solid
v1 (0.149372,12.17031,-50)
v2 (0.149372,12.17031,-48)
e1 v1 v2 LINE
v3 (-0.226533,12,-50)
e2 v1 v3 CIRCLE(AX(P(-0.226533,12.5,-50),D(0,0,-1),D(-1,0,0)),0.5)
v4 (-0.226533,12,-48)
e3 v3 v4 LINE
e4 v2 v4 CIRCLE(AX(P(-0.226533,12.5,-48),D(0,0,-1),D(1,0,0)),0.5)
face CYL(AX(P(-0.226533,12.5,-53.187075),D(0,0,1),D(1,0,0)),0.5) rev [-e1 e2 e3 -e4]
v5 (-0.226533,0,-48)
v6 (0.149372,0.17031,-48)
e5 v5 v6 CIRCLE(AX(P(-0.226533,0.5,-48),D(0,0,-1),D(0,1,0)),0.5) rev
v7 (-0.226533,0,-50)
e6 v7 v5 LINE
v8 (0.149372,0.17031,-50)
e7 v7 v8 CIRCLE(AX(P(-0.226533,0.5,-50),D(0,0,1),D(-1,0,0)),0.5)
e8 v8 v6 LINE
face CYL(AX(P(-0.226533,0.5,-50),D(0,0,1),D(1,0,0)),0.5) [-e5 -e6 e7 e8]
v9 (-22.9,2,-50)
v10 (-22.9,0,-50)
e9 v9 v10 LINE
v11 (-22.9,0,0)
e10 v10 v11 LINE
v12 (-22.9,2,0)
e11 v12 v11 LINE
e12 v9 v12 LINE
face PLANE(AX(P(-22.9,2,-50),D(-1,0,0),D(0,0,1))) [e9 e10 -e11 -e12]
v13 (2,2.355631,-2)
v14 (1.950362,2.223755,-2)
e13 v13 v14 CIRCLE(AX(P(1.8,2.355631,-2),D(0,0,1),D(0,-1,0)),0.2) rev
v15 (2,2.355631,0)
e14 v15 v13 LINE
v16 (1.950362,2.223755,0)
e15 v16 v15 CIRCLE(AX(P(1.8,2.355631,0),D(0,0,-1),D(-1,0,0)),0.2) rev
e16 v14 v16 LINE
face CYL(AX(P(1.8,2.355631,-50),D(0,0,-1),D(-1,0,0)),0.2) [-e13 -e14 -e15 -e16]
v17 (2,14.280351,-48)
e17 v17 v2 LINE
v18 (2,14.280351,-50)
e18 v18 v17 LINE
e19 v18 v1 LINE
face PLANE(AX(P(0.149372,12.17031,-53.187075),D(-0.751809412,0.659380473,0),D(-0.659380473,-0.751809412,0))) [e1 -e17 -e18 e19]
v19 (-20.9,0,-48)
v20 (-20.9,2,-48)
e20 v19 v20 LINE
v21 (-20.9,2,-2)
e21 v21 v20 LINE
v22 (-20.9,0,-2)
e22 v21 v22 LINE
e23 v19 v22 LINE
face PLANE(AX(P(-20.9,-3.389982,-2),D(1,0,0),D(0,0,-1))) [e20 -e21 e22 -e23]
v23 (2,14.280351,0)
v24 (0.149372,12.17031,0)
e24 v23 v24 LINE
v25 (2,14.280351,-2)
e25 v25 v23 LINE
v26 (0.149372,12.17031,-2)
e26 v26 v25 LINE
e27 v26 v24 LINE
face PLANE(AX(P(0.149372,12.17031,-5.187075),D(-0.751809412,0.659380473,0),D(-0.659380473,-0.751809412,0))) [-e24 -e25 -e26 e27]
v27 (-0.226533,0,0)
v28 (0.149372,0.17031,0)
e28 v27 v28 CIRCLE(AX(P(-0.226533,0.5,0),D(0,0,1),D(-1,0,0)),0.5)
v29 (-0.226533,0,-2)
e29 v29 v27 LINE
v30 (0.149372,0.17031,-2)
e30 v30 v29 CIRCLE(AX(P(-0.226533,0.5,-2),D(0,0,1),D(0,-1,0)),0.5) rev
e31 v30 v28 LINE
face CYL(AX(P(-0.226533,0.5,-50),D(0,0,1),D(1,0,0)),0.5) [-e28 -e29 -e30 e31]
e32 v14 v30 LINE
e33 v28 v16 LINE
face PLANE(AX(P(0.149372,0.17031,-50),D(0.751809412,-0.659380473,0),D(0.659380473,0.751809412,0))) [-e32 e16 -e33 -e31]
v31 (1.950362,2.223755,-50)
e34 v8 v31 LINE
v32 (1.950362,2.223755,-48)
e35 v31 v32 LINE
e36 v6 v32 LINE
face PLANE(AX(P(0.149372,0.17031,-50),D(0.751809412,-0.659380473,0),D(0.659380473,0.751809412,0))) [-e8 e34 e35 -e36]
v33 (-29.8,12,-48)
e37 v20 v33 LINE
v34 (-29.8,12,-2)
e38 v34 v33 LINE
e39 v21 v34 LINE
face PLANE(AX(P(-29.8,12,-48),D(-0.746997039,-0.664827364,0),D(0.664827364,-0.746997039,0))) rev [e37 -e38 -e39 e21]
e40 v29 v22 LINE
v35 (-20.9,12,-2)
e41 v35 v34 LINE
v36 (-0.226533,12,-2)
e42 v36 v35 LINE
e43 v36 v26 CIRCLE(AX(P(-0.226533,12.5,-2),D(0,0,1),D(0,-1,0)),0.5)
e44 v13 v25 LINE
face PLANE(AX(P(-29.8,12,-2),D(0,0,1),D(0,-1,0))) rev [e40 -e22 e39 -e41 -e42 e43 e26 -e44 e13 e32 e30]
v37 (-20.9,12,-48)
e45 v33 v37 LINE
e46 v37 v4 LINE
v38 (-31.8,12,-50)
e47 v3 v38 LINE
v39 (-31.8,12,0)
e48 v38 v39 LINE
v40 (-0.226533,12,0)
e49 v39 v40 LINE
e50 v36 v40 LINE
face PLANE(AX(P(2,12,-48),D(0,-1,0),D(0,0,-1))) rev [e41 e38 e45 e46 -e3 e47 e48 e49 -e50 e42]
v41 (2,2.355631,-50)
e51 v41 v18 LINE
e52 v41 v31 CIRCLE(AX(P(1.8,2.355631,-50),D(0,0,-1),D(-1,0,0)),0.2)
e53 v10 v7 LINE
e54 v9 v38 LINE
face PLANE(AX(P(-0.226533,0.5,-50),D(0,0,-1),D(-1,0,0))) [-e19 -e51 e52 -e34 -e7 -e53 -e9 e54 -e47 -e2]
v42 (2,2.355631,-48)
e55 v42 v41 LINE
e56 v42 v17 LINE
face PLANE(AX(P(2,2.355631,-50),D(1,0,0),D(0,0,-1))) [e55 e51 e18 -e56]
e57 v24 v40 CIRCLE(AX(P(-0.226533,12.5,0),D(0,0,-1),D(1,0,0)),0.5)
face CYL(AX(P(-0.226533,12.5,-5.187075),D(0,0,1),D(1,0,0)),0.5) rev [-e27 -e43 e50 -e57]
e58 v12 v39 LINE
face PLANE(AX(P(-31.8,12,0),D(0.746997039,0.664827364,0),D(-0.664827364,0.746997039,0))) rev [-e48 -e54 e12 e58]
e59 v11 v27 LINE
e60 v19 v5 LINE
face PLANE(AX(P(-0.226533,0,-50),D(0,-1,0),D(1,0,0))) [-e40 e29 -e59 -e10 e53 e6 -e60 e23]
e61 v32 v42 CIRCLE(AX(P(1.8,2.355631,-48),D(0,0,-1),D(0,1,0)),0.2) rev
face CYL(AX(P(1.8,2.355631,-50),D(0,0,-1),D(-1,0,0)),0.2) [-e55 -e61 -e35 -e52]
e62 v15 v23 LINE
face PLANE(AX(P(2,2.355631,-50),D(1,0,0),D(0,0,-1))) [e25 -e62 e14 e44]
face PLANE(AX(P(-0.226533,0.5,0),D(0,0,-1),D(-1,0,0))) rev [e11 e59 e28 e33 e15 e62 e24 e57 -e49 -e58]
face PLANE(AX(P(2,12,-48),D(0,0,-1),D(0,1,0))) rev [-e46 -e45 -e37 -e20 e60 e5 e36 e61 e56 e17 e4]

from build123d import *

# Parameters (mm, degrees)
BOSS_EXTRUDE1_DEPTH = 50
CUT_EXTRUDE1_DEPTH  = 13
FILLET1_R           = 0.2
CUT_EXTRUDE2_DEPTH  = 22.9
BOSS_EXTRUDE2_DEPTH = 2
BOSS_EXTRUDE4_START = -50
BOSS_EXTRUDE4_DEPTH = 2


with BuildPart() as part:
    # Sketch1 → Boss-Extrude1 (new body)
    with BuildSketch(Plane.XY):
        with BuildLine():
            Line((-0.226533162, 0), (-22.9, 0))
            Line((-22.9, 0), (-22.9, 2))
            Line((-22.9, 2), (-1.79756025, 2))
            ThreePointArc((-1.79756025, 2), (-1.552823997, 2.063990635), (-1.370731057, 2.239583333))
            ThreePointArc((-1.370731057, 2.239583333), (-0.802551257, 2.977276557), (-0.088888889, 3.575361503))
            ThreePointArc((-0.088888889, 3.575361503), (-0.023616579, 3.647376483), (0, 3.741657387))
            Line((0, 3.741657387), (0, 4))
            Line((0, 4), (2, 4))
            Line((2, 4), (2, 2.355630783))
            ThreePointArc((2, 2.355630783), (1.987179561, 2.285176459), (1.950361882, 2.223754688))
            Line((1.950361882, 2.223754688), (0.149371544, 0.170309763))
            ThreePointArc((0.149371544, 0.170309763), (-0.020190145, 0.044563331), (-0.226533162, 0))
        make_face()
    extrude(amount=-BOSS_EXTRUDE1_DEPTH)

    # Sketch3 → Loft1 section 0
    with BuildSketch(Plane(origin=(0, 2, 0), x_dir=(1, 0, 0), z_dir=(0, 1, 0))):
        with BuildLine():
            Line((2, 50), (-22.9, 50))
            Line((-22.9, 50), (-22.9, 0))
            Line((-22.9, 0), (2, 0))
            Line((2, 0), (2, 2))
            Line((2, 2), (-20.9, 2))
            Line((-20.9, 2), (-20.9, 48))
            Line((-20.9, 48), (2, 48))
            Line((2, 48), (2, 50))
        make_face()
    # Sketch4 → Loft1 section 1
    with BuildSketch(Plane(origin=(0, 12, 0), x_dir=(-1, 0, 0), z_dir=(0, 1, 0))):
        with BuildLine():
            Line((-2, -50), (31.8, -50))
            Line((31.8, -50), (31.8, 0))
            Line((31.8, 0), (-2, 0))
            Line((-2, 0), (-2, -2))
            Line((-2, -2), (29.8, -2))
            Line((29.8, -2), (29.8, -48))
            Line((29.8, -48), (-2, -48))
            Line((-2, -48), (-2, -50))
        make_face()
    loft()

    # Sketch5 → Cut-Extrude1 (cut)
    with BuildSketch(Plane(origin=(0, 0, 0), x_dir=(0, 0, -1), z_dir=(0.7518094115561124, -0.6593804733957871, 0))):
        Polygon((50, 0.226533162), (0, 0.226533162), (-3.433361375, 0.226533162), (-3.433361375, 4.468376884), (51.426542164, 4.468376884), (51.426542164, 0.226533162), align=None)
    extrude(amount=CUT_EXTRUDE1_DEPTH, mode=Mode.SUBTRACT)

    # Fillet1
    # the kernel refuses this fillet: 0.2 mm, written as the material it takes off along each edge
    with BuildSketch(Plane(origin=(2, 2.28035085, -47.811800168), x_dir=(0, 1, 0), z_dir=(0, 0, -1)), Plane(origin=(2, 2.28035085, 0.188199832), x_dir=(0, 1, 0), z_dir=(0, 0, -1))) as fillet1_piece_1:
        with BuildLine():
            CenterArc((FILLET1_R * 0.376399663711, -FILLET1_R), FILLET1_R, 90, 41.252641273)
            Line((-FILLET1_R * 0.282980809685, -FILLET1_R * 0.248190588444), (0, 0))
            Line((0, 0), (FILLET1_R * 0.376399663711, 0))
        make_face()
    extrude(amount=2.376399664, mode=Mode.SUBTRACT)

    # Sketch6 → Cut-Extrude2 (cut)
    with BuildSketch(Plane(origin=(2, 0, 0), x_dir=(0, 0, -1), z_dir=(1, 0, 0))):
        Polygon((2, 4), (2, 12), (48, 12), (48, 4), (48, -3.389982461), (2, -3.389982461), align=None)
    extrude(amount=-CUT_EXTRUDE2_DEPTH, mode=Mode.SUBTRACT)

    # Sketch7 → Boss-Extrude2 (add)
    with BuildSketch(Plane.XY):
        with BuildLine():
            Line((2, 14.28035085), (2, 12))
            Line((2, 12), (-0.226533162, 12))
            ThreePointArc((-0.226533162, 12), (-0.020190145, 12.044563331), (0.149371544, 12.170309763))
            Line((0.149371544, 12.170309763), (2, 14.28035085))
        make_face()
    extrude(amount=-BOSS_EXTRUDE2_DEPTH)

    # Sketch7<2> → Boss-Extrude4 (add)
    with BuildSketch(Plane.XY.offset(BOSS_EXTRUDE4_START)):
        with BuildLine():
            Line((2, 14.28035085), (2, 12))
            Line((2, 12), (-0.226533162, 12))
            ThreePointArc((-0.226533162, 12), (-0.020190145, 12.044563331), (0.149371544, 12.170309763))
            Line((0.149371544, 12.170309763), (2, 14.28035085))
        make_face()
    extrude(amount=BOSS_EXTRUDE4_DEPTH)


solid = part.part
